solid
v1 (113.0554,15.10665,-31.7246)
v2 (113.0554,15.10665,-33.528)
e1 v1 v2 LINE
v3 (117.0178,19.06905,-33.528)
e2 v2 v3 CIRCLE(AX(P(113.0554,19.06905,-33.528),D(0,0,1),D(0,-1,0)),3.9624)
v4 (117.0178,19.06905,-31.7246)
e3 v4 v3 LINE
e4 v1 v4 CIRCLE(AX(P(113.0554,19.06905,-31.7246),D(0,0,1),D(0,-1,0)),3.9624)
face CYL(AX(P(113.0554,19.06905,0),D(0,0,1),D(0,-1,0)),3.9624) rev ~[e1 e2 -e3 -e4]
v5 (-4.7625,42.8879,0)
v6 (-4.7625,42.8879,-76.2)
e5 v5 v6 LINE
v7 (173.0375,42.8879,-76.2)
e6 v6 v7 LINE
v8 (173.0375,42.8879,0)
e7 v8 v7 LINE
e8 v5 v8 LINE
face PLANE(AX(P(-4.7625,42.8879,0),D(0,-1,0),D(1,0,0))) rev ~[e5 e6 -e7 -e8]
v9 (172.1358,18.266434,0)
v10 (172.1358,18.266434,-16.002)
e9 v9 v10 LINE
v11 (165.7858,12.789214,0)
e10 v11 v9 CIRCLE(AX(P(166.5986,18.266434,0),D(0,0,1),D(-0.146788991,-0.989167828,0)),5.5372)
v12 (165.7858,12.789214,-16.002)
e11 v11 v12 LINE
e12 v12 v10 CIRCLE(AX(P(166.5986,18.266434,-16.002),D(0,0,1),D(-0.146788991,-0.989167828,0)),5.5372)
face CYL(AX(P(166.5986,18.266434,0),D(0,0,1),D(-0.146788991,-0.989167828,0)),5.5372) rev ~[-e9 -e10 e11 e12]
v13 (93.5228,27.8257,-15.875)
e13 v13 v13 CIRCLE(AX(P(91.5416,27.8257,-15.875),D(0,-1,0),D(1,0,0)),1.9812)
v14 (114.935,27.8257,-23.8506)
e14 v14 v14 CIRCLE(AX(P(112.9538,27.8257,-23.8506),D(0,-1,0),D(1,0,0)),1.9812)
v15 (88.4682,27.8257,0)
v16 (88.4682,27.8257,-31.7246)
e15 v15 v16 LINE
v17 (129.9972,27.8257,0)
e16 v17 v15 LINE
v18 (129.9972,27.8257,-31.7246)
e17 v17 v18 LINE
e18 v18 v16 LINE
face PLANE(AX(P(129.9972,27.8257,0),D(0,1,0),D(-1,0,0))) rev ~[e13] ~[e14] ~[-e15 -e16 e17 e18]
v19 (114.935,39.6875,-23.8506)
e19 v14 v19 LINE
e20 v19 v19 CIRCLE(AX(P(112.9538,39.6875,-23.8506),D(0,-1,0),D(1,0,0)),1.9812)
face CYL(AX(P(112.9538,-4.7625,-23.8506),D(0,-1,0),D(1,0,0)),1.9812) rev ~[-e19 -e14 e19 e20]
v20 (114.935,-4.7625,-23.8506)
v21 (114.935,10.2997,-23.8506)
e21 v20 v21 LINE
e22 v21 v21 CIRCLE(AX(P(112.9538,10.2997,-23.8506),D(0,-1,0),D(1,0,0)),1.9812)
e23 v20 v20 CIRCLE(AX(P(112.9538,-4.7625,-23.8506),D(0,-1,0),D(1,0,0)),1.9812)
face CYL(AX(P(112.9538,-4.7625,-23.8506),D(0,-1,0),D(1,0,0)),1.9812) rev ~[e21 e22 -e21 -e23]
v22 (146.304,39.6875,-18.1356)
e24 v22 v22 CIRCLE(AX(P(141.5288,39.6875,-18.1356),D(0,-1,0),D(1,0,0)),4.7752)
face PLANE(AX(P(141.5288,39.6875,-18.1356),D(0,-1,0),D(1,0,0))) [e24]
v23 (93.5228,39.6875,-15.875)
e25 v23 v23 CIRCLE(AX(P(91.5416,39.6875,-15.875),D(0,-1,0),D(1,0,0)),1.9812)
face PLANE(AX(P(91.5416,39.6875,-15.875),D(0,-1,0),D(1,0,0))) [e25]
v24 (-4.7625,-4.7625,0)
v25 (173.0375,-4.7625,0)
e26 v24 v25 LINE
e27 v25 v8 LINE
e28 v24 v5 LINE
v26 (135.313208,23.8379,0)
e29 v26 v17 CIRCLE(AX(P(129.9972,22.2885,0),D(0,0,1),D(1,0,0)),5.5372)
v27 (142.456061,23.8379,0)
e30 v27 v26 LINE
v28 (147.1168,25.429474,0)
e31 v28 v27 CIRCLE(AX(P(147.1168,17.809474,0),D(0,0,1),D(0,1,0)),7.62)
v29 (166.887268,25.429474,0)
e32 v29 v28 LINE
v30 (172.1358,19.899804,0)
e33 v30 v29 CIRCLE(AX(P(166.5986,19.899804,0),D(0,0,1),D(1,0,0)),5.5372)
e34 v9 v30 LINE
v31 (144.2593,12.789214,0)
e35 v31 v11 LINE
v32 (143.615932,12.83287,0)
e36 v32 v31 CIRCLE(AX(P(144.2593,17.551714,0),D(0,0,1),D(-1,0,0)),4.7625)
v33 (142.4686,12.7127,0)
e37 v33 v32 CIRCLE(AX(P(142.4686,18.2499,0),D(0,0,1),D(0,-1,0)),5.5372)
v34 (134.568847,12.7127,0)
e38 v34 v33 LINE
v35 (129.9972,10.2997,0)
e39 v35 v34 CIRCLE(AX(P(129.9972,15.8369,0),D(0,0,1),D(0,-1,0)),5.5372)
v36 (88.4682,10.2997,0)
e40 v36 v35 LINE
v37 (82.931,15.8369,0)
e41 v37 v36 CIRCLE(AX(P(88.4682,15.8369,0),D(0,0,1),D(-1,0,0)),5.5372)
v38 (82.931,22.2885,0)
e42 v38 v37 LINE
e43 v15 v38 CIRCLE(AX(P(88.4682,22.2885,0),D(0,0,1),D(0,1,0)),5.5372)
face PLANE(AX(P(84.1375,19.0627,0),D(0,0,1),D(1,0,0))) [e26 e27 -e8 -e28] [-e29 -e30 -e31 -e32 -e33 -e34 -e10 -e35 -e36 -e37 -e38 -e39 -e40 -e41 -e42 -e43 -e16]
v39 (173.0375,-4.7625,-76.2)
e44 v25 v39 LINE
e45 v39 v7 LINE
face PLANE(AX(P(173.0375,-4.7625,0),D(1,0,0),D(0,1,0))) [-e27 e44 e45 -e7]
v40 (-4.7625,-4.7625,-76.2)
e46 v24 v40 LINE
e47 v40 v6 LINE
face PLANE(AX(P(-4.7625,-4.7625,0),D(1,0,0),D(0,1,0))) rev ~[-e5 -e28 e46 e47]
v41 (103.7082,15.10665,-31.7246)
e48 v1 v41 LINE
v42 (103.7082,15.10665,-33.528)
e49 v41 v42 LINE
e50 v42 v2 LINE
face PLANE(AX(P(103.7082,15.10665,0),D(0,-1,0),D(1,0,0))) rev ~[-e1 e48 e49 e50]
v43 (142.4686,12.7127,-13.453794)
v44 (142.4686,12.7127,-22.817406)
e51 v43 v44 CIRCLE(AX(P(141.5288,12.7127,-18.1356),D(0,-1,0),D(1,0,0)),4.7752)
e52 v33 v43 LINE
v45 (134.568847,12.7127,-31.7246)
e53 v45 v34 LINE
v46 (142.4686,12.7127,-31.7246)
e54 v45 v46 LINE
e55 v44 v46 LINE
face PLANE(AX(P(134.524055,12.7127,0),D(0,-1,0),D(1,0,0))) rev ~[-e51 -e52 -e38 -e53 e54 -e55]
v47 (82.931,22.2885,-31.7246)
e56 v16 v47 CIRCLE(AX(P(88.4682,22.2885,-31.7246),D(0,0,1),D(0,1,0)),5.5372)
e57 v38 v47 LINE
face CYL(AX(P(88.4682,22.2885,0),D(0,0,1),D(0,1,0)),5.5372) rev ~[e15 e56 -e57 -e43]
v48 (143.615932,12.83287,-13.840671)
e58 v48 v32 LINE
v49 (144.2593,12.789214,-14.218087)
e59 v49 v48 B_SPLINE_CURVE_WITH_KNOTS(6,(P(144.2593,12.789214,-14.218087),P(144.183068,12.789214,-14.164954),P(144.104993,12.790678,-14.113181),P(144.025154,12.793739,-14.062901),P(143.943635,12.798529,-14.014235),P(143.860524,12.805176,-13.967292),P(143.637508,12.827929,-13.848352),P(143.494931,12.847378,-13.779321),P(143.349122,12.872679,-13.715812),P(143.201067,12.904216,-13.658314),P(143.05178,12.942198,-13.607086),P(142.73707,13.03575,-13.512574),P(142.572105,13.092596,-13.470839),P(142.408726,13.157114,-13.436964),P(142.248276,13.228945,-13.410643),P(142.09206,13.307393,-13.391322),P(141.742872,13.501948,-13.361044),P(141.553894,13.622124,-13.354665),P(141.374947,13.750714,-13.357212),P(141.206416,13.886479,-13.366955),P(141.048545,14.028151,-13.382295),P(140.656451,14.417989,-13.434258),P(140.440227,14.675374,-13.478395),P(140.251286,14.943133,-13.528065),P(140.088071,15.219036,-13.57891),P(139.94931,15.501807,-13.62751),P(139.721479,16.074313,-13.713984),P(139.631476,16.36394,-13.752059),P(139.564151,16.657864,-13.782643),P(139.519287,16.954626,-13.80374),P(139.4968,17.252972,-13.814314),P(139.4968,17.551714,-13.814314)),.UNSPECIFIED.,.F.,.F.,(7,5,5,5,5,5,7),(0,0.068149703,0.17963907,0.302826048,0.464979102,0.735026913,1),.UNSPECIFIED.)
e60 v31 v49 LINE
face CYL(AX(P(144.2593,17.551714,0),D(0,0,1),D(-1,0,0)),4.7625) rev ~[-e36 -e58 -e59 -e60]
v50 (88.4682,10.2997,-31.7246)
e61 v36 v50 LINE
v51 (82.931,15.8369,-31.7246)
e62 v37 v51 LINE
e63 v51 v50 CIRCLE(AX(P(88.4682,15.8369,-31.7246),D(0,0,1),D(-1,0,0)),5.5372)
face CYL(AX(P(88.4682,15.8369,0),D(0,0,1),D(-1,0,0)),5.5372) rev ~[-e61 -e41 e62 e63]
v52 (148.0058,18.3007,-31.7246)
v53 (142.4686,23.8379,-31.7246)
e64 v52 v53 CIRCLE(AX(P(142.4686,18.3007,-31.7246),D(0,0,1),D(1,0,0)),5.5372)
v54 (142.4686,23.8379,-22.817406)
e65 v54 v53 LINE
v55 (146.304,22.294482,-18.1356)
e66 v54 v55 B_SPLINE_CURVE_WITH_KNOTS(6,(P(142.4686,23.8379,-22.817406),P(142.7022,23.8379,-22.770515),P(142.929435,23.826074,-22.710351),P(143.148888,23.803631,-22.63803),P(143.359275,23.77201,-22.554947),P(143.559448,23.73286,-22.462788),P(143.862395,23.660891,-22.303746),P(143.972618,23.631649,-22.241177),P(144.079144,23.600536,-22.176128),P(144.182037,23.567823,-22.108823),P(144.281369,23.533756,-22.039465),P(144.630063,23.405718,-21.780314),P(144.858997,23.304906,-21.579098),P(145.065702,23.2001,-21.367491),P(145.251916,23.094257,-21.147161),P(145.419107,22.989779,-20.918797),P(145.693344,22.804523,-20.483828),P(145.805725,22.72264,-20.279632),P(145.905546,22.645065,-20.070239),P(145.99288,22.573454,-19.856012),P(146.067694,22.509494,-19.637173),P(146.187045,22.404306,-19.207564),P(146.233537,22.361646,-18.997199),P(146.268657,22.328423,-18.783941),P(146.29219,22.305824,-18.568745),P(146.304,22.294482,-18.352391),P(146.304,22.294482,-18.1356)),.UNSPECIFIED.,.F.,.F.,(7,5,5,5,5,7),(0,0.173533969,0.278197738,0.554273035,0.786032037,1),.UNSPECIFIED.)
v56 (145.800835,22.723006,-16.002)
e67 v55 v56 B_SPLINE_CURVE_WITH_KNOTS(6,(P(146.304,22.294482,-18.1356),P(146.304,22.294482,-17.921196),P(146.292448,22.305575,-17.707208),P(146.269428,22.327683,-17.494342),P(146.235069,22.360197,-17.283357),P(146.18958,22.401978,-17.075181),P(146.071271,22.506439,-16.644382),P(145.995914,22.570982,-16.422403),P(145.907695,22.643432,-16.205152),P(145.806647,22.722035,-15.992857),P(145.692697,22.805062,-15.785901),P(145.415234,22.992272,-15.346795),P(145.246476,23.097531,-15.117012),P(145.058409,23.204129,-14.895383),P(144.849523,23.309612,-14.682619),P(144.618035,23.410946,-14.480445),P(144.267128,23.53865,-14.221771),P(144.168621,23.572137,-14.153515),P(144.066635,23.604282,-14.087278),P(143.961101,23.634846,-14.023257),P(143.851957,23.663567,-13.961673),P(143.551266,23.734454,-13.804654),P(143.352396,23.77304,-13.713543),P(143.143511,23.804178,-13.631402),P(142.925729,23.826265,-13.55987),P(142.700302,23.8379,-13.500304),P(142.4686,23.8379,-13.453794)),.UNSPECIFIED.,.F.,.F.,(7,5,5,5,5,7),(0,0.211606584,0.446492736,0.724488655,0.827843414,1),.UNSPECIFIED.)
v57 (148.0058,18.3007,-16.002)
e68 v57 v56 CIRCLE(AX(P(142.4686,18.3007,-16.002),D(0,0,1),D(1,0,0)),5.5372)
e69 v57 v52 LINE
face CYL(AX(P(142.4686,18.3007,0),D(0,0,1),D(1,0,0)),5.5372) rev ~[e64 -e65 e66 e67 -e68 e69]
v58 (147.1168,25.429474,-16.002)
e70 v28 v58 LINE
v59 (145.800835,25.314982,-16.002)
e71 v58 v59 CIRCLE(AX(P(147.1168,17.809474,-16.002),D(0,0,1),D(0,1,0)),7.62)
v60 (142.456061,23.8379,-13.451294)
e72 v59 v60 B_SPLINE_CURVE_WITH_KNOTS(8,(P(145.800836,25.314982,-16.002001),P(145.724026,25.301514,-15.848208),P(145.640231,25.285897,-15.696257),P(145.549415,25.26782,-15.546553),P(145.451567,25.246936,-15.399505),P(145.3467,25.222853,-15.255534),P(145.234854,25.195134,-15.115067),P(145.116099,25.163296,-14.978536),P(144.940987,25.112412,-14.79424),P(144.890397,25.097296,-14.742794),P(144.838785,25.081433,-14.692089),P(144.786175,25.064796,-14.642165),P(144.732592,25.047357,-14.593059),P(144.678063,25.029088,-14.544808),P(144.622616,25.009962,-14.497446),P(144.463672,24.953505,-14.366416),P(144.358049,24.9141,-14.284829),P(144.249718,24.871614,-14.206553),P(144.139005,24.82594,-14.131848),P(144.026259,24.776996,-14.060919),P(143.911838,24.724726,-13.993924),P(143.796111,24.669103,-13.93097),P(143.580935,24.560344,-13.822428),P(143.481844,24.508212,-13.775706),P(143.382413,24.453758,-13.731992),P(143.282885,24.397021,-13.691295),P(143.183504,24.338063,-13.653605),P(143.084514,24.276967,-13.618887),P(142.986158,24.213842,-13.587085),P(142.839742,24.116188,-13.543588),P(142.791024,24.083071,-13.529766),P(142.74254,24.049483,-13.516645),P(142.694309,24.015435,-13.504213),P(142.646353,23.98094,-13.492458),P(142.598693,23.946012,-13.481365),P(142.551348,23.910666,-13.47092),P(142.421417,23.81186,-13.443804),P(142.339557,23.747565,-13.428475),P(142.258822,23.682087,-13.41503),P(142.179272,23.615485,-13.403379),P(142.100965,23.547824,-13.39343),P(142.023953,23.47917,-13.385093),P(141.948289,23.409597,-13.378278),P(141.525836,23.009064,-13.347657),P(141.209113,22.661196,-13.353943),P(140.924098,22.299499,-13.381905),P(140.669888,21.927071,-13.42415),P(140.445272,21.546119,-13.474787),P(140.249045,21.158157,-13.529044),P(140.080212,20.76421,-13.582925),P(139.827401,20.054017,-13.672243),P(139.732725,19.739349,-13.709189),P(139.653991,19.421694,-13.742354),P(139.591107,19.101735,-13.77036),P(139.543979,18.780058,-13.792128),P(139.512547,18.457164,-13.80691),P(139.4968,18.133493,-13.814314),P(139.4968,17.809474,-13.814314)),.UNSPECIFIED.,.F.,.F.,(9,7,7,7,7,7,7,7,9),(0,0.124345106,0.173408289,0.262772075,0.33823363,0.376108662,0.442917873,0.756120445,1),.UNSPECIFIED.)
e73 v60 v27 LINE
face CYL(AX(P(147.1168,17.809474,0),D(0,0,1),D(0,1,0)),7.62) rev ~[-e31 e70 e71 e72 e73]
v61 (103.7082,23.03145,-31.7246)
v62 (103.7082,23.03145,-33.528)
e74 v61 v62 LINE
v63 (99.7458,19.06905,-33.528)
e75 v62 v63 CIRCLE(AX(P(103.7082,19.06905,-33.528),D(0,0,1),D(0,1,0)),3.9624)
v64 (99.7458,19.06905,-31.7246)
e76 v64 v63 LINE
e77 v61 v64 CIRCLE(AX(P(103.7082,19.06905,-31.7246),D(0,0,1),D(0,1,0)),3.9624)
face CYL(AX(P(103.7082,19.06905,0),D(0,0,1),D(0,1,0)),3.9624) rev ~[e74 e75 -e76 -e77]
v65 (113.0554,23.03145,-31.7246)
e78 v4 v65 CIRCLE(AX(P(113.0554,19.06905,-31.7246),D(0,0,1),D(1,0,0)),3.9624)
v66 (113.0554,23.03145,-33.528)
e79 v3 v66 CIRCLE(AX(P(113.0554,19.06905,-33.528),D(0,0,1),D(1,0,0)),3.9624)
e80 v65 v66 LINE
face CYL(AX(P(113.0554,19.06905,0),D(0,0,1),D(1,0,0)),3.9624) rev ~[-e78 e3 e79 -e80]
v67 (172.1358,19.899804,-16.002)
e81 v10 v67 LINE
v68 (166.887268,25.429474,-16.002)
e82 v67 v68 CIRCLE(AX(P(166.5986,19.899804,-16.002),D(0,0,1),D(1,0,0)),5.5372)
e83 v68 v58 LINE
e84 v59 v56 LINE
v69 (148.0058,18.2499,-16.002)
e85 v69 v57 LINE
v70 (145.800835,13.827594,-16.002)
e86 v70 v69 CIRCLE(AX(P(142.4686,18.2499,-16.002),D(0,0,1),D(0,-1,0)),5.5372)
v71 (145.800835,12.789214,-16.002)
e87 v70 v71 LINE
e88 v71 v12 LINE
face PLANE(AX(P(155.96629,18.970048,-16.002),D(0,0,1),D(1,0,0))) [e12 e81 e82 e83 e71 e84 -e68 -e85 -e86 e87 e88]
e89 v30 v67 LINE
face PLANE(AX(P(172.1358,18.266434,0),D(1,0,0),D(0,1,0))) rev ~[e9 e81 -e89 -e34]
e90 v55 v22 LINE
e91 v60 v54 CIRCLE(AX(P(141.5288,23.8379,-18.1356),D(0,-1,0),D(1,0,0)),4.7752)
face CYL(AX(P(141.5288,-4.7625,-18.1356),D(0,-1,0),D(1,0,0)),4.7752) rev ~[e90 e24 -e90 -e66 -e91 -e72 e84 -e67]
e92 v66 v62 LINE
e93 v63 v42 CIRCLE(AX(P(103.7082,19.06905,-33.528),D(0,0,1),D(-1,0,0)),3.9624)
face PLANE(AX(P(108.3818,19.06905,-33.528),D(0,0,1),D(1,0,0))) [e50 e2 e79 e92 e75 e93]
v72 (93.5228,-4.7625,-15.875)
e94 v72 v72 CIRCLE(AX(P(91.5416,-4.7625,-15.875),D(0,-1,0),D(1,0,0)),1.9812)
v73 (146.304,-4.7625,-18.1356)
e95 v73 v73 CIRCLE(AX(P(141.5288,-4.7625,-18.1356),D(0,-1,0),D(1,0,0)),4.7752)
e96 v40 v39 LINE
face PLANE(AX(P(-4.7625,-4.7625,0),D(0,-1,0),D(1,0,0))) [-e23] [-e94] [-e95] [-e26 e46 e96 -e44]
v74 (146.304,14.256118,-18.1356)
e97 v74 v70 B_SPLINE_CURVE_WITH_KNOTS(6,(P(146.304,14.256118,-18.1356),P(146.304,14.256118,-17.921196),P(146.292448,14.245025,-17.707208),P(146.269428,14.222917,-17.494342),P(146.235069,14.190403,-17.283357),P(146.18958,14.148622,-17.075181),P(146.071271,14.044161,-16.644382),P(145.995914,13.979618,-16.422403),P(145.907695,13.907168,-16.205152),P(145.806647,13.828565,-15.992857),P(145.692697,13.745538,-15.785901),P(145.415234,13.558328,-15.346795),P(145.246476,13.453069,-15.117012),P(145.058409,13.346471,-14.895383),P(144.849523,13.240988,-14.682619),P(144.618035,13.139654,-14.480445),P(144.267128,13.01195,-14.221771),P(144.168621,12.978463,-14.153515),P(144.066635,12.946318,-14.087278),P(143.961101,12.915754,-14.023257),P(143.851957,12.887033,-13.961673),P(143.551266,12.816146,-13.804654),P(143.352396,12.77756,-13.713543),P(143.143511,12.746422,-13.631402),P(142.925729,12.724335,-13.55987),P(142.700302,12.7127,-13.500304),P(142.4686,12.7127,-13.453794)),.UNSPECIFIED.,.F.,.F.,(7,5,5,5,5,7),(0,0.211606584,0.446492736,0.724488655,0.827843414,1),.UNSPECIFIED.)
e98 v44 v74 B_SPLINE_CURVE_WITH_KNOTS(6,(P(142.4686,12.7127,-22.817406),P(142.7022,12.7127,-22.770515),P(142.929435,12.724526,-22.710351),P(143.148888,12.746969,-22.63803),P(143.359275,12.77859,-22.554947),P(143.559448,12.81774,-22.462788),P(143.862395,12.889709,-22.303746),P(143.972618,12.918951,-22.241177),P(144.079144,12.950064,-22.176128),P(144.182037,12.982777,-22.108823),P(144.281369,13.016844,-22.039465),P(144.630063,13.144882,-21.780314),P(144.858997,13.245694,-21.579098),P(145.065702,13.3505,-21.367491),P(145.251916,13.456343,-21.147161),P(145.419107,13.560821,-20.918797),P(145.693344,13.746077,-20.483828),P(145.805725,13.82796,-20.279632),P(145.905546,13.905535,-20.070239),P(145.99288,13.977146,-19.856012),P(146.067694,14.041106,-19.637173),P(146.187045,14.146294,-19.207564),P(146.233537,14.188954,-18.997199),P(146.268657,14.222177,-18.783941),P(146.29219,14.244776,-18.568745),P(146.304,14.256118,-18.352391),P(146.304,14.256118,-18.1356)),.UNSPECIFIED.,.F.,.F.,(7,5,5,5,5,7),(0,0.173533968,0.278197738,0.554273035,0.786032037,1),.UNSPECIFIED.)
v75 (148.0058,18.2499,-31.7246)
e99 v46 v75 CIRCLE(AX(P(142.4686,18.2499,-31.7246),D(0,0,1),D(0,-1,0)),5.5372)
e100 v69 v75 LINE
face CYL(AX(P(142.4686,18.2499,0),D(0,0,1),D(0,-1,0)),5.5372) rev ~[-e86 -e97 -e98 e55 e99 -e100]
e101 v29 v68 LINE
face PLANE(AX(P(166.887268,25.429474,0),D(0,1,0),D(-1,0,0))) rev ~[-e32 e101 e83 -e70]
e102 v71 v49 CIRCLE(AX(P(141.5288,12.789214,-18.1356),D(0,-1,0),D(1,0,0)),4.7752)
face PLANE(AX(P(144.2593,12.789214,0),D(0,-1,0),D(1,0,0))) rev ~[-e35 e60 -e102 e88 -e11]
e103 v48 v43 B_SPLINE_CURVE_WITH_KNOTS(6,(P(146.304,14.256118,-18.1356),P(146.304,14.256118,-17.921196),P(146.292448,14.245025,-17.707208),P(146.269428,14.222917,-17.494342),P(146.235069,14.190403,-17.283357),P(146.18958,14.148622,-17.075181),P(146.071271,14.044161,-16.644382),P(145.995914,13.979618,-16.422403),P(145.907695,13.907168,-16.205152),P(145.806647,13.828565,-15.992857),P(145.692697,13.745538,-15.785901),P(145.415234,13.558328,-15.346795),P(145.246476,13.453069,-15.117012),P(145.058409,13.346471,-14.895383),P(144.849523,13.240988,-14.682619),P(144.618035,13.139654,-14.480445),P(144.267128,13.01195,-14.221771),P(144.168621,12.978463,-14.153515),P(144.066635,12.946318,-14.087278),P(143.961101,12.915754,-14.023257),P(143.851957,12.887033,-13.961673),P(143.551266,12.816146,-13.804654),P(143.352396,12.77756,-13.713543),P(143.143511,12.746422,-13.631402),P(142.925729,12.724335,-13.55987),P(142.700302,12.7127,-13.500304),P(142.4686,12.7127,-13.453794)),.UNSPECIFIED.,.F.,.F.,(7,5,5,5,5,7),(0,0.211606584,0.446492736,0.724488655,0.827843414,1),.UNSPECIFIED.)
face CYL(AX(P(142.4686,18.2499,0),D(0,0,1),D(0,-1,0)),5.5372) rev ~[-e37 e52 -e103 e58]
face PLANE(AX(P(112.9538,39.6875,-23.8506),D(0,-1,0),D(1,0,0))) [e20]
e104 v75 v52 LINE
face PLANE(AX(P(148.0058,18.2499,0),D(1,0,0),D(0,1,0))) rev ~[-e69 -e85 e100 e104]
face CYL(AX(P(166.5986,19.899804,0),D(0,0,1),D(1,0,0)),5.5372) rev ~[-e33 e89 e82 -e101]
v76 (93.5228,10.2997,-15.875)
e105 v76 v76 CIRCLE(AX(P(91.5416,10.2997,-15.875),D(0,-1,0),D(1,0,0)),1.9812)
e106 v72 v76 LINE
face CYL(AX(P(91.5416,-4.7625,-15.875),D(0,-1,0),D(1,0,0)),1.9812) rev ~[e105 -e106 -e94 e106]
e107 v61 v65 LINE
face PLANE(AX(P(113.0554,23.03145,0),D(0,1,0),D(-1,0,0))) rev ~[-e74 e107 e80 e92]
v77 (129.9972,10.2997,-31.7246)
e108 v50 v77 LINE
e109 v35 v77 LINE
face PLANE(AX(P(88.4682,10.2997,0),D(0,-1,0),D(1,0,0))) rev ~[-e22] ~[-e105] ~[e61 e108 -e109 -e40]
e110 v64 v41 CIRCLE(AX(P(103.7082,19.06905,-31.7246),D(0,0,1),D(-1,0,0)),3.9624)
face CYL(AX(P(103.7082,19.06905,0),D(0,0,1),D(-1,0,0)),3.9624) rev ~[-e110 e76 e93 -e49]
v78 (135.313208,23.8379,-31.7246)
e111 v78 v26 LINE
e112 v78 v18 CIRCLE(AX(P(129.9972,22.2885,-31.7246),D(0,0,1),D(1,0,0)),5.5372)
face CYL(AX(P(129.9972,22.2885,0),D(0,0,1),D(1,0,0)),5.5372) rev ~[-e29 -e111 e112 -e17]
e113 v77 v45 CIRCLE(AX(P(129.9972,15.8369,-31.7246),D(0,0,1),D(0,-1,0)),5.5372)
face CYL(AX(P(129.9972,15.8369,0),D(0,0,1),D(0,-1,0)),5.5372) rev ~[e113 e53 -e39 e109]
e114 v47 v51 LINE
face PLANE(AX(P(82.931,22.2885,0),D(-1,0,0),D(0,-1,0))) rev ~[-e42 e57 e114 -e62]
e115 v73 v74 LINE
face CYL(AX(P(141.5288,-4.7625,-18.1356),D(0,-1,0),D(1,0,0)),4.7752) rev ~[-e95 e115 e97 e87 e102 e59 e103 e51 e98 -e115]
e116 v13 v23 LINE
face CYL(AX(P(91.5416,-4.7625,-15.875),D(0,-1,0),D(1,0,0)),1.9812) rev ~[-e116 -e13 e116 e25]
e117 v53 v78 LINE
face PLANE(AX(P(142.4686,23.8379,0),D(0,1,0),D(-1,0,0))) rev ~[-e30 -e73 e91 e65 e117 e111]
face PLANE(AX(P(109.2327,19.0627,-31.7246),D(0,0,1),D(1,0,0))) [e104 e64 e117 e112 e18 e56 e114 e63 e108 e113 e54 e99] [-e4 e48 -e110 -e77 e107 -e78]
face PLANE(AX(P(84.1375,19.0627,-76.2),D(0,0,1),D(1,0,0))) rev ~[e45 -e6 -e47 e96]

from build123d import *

# Parameters (mm, degrees)
F0_W      = 177.8
F0_H      = 47.6504
F1_DEPTH  = 76.2
F2_R      = 4.7752
F2_R_2    = 1.9812
F3_DEPTH  = 44.45
F5_DEPTH  = 16.002
F7_DEPTH  = 33.528
F9_DEPTH  = 31.7246
F11_DEPTH = 31.7246


# Not quite as in the source:
# - a feature names something its author has since deleted; it is built from what else it names


with BuildPart() as f1:
    # F0 (on Top) → F1 (new body)
    with BuildSketch(Plane.XY):
        with Locations((84.1375, 19.0627)):
            Rectangle(F0_W, F0_H)
    extrude(amount=-F1_DEPTH)

    # F2 (on face) → F3 (cut)
    with BuildSketch(Plane.XZ.offset(4.7625)):
        with Locations((141.5288, -18.1356)):
            Circle(F2_R)
        with Locations((112.9538, -23.8506)):
            Circle(F2_R_2)
        with Locations((91.5416, -15.875)):
            Circle(F2_R_2)
    extrude(amount=-F3_DEPTH, mode=Mode.SUBTRACT)

    # F4 (on face) → F5 (cut)
    with BuildSketch(Plane.XY):
        with BuildLine():
            Line((172.1358, 18.2664336953), (172.1358, 19.8998040895))
            ThreePointArc((172.1358, 19.8998040895), (170.6147547927, 23.7117700549), (166.887268424, 25.4294744577))
            Line((166.887268424, 25.4294744577), (147.1168, 25.4294744577))
            ThreePointArc((147.1168, 25.4294744577), (141.7286463274, 23.1976281303), (139.4968, 17.8094744577))
            Line((139.4968, 17.8094744577), (139.4968, 17.5517135975))
            ThreePointArc((139.4968, 17.5517135975), (140.8917039546, 14.1841175521), (144.2593, 12.7892135975))
            Line((144.2593, 12.7892135975), (165.7858, 12.7892135975))
            ThreePointArc((165.7858, 12.7892135975), (170.2152246474, 14.0735098945), (172.1358, 18.2664336953))
        make_face()
    extrude(amount=-F5_DEPTH, mode=Mode.SUBTRACT)

    # F6 (on face) → F7 (cut)
    with BuildSketch(Plane.XY):
        with BuildLine():
            Line((113.0554, 23.03145), (103.7082, 23.03145))
            ThreePointArc((103.7082, 23.03145), (100.9063600902, 21.8708899098), (99.7458, 19.06905))
            ThreePointArc((99.7458, 19.06905), (100.9063600902, 16.2672100902), (103.7082, 15.10665))
            Line((103.7082, 15.10665), (113.0554, 15.10665))
            ThreePointArc((113.0554, 15.10665), (115.8572399098, 16.2672100902), (117.0178, 19.06905))
            ThreePointArc((117.0178, 19.06905), (115.8572399098, 21.8708899098), (113.0554, 23.03145))
        make_face()
    extrude(amount=-F7_DEPTH, mode=Mode.SUBTRACT)

    # F8 (on face) → F9 (cut)
    with BuildSketch(Plane.XY):
        with BuildLine():
            Line((129.9972, 27.8257), (88.4682, 27.8257))
            ThreePointArc((88.4682, 27.8257), (84.5528083312, 26.2038916688), (82.931, 22.2885))
            Line((82.931, 22.2885), (82.931, 15.8369))
            ThreePointArc((82.931, 15.8369), (84.5528083312, 11.9215083312), (88.4682, 10.2997))
            Line((88.4682, 10.2997), (129.9972, 10.2997))
            ThreePointArc((129.9972, 10.2997), (133.9125916688, 11.9215083312), (135.5344, 15.8369))
            Line((135.5344, 15.8369), (135.5344, 22.2885))
            ThreePointArc((135.5344, 22.2885), (133.9125916688, 26.2038916688), (129.9972, 27.8257))
        make_face()
    extrude(amount=-F9_DEPTH, mode=Mode.SUBTRACT)

    # F10 (on face) → F11 (cut)
    with BuildSketch(Plane.XY):
        with BuildLine():
            Line((142.4686, 23.8379), (134.5240552125, 23.8379))
            ThreePointArc((134.5240552125, 23.8379), (132.2789911822, 22.9079640303), (131.3490552125, 20.6629))
            Line((131.3490552125, 20.6629), (131.3490552125, 15.8877))
            ThreePointArc((131.3490552125, 15.8877), (132.2789911822, 13.6426359697), (134.5240552125, 12.7127))
            Line((134.5240552125, 12.7127), (142.4686, 12.7127))
            ThreePointArc((142.4686, 12.7127), (146.3839916688, 14.3345083312), (148.0058, 18.2499))
            Line((148.0058, 18.2499), (148.0058, 18.3007))
            ThreePointArc((148.0058, 18.3007), (146.3839916688, 22.2160916688), (142.4686, 23.8379))
        make_face()
    extrude(amount=-F11_DEPTH, mode=Mode.SUBTRACT)


solid = f1.part
